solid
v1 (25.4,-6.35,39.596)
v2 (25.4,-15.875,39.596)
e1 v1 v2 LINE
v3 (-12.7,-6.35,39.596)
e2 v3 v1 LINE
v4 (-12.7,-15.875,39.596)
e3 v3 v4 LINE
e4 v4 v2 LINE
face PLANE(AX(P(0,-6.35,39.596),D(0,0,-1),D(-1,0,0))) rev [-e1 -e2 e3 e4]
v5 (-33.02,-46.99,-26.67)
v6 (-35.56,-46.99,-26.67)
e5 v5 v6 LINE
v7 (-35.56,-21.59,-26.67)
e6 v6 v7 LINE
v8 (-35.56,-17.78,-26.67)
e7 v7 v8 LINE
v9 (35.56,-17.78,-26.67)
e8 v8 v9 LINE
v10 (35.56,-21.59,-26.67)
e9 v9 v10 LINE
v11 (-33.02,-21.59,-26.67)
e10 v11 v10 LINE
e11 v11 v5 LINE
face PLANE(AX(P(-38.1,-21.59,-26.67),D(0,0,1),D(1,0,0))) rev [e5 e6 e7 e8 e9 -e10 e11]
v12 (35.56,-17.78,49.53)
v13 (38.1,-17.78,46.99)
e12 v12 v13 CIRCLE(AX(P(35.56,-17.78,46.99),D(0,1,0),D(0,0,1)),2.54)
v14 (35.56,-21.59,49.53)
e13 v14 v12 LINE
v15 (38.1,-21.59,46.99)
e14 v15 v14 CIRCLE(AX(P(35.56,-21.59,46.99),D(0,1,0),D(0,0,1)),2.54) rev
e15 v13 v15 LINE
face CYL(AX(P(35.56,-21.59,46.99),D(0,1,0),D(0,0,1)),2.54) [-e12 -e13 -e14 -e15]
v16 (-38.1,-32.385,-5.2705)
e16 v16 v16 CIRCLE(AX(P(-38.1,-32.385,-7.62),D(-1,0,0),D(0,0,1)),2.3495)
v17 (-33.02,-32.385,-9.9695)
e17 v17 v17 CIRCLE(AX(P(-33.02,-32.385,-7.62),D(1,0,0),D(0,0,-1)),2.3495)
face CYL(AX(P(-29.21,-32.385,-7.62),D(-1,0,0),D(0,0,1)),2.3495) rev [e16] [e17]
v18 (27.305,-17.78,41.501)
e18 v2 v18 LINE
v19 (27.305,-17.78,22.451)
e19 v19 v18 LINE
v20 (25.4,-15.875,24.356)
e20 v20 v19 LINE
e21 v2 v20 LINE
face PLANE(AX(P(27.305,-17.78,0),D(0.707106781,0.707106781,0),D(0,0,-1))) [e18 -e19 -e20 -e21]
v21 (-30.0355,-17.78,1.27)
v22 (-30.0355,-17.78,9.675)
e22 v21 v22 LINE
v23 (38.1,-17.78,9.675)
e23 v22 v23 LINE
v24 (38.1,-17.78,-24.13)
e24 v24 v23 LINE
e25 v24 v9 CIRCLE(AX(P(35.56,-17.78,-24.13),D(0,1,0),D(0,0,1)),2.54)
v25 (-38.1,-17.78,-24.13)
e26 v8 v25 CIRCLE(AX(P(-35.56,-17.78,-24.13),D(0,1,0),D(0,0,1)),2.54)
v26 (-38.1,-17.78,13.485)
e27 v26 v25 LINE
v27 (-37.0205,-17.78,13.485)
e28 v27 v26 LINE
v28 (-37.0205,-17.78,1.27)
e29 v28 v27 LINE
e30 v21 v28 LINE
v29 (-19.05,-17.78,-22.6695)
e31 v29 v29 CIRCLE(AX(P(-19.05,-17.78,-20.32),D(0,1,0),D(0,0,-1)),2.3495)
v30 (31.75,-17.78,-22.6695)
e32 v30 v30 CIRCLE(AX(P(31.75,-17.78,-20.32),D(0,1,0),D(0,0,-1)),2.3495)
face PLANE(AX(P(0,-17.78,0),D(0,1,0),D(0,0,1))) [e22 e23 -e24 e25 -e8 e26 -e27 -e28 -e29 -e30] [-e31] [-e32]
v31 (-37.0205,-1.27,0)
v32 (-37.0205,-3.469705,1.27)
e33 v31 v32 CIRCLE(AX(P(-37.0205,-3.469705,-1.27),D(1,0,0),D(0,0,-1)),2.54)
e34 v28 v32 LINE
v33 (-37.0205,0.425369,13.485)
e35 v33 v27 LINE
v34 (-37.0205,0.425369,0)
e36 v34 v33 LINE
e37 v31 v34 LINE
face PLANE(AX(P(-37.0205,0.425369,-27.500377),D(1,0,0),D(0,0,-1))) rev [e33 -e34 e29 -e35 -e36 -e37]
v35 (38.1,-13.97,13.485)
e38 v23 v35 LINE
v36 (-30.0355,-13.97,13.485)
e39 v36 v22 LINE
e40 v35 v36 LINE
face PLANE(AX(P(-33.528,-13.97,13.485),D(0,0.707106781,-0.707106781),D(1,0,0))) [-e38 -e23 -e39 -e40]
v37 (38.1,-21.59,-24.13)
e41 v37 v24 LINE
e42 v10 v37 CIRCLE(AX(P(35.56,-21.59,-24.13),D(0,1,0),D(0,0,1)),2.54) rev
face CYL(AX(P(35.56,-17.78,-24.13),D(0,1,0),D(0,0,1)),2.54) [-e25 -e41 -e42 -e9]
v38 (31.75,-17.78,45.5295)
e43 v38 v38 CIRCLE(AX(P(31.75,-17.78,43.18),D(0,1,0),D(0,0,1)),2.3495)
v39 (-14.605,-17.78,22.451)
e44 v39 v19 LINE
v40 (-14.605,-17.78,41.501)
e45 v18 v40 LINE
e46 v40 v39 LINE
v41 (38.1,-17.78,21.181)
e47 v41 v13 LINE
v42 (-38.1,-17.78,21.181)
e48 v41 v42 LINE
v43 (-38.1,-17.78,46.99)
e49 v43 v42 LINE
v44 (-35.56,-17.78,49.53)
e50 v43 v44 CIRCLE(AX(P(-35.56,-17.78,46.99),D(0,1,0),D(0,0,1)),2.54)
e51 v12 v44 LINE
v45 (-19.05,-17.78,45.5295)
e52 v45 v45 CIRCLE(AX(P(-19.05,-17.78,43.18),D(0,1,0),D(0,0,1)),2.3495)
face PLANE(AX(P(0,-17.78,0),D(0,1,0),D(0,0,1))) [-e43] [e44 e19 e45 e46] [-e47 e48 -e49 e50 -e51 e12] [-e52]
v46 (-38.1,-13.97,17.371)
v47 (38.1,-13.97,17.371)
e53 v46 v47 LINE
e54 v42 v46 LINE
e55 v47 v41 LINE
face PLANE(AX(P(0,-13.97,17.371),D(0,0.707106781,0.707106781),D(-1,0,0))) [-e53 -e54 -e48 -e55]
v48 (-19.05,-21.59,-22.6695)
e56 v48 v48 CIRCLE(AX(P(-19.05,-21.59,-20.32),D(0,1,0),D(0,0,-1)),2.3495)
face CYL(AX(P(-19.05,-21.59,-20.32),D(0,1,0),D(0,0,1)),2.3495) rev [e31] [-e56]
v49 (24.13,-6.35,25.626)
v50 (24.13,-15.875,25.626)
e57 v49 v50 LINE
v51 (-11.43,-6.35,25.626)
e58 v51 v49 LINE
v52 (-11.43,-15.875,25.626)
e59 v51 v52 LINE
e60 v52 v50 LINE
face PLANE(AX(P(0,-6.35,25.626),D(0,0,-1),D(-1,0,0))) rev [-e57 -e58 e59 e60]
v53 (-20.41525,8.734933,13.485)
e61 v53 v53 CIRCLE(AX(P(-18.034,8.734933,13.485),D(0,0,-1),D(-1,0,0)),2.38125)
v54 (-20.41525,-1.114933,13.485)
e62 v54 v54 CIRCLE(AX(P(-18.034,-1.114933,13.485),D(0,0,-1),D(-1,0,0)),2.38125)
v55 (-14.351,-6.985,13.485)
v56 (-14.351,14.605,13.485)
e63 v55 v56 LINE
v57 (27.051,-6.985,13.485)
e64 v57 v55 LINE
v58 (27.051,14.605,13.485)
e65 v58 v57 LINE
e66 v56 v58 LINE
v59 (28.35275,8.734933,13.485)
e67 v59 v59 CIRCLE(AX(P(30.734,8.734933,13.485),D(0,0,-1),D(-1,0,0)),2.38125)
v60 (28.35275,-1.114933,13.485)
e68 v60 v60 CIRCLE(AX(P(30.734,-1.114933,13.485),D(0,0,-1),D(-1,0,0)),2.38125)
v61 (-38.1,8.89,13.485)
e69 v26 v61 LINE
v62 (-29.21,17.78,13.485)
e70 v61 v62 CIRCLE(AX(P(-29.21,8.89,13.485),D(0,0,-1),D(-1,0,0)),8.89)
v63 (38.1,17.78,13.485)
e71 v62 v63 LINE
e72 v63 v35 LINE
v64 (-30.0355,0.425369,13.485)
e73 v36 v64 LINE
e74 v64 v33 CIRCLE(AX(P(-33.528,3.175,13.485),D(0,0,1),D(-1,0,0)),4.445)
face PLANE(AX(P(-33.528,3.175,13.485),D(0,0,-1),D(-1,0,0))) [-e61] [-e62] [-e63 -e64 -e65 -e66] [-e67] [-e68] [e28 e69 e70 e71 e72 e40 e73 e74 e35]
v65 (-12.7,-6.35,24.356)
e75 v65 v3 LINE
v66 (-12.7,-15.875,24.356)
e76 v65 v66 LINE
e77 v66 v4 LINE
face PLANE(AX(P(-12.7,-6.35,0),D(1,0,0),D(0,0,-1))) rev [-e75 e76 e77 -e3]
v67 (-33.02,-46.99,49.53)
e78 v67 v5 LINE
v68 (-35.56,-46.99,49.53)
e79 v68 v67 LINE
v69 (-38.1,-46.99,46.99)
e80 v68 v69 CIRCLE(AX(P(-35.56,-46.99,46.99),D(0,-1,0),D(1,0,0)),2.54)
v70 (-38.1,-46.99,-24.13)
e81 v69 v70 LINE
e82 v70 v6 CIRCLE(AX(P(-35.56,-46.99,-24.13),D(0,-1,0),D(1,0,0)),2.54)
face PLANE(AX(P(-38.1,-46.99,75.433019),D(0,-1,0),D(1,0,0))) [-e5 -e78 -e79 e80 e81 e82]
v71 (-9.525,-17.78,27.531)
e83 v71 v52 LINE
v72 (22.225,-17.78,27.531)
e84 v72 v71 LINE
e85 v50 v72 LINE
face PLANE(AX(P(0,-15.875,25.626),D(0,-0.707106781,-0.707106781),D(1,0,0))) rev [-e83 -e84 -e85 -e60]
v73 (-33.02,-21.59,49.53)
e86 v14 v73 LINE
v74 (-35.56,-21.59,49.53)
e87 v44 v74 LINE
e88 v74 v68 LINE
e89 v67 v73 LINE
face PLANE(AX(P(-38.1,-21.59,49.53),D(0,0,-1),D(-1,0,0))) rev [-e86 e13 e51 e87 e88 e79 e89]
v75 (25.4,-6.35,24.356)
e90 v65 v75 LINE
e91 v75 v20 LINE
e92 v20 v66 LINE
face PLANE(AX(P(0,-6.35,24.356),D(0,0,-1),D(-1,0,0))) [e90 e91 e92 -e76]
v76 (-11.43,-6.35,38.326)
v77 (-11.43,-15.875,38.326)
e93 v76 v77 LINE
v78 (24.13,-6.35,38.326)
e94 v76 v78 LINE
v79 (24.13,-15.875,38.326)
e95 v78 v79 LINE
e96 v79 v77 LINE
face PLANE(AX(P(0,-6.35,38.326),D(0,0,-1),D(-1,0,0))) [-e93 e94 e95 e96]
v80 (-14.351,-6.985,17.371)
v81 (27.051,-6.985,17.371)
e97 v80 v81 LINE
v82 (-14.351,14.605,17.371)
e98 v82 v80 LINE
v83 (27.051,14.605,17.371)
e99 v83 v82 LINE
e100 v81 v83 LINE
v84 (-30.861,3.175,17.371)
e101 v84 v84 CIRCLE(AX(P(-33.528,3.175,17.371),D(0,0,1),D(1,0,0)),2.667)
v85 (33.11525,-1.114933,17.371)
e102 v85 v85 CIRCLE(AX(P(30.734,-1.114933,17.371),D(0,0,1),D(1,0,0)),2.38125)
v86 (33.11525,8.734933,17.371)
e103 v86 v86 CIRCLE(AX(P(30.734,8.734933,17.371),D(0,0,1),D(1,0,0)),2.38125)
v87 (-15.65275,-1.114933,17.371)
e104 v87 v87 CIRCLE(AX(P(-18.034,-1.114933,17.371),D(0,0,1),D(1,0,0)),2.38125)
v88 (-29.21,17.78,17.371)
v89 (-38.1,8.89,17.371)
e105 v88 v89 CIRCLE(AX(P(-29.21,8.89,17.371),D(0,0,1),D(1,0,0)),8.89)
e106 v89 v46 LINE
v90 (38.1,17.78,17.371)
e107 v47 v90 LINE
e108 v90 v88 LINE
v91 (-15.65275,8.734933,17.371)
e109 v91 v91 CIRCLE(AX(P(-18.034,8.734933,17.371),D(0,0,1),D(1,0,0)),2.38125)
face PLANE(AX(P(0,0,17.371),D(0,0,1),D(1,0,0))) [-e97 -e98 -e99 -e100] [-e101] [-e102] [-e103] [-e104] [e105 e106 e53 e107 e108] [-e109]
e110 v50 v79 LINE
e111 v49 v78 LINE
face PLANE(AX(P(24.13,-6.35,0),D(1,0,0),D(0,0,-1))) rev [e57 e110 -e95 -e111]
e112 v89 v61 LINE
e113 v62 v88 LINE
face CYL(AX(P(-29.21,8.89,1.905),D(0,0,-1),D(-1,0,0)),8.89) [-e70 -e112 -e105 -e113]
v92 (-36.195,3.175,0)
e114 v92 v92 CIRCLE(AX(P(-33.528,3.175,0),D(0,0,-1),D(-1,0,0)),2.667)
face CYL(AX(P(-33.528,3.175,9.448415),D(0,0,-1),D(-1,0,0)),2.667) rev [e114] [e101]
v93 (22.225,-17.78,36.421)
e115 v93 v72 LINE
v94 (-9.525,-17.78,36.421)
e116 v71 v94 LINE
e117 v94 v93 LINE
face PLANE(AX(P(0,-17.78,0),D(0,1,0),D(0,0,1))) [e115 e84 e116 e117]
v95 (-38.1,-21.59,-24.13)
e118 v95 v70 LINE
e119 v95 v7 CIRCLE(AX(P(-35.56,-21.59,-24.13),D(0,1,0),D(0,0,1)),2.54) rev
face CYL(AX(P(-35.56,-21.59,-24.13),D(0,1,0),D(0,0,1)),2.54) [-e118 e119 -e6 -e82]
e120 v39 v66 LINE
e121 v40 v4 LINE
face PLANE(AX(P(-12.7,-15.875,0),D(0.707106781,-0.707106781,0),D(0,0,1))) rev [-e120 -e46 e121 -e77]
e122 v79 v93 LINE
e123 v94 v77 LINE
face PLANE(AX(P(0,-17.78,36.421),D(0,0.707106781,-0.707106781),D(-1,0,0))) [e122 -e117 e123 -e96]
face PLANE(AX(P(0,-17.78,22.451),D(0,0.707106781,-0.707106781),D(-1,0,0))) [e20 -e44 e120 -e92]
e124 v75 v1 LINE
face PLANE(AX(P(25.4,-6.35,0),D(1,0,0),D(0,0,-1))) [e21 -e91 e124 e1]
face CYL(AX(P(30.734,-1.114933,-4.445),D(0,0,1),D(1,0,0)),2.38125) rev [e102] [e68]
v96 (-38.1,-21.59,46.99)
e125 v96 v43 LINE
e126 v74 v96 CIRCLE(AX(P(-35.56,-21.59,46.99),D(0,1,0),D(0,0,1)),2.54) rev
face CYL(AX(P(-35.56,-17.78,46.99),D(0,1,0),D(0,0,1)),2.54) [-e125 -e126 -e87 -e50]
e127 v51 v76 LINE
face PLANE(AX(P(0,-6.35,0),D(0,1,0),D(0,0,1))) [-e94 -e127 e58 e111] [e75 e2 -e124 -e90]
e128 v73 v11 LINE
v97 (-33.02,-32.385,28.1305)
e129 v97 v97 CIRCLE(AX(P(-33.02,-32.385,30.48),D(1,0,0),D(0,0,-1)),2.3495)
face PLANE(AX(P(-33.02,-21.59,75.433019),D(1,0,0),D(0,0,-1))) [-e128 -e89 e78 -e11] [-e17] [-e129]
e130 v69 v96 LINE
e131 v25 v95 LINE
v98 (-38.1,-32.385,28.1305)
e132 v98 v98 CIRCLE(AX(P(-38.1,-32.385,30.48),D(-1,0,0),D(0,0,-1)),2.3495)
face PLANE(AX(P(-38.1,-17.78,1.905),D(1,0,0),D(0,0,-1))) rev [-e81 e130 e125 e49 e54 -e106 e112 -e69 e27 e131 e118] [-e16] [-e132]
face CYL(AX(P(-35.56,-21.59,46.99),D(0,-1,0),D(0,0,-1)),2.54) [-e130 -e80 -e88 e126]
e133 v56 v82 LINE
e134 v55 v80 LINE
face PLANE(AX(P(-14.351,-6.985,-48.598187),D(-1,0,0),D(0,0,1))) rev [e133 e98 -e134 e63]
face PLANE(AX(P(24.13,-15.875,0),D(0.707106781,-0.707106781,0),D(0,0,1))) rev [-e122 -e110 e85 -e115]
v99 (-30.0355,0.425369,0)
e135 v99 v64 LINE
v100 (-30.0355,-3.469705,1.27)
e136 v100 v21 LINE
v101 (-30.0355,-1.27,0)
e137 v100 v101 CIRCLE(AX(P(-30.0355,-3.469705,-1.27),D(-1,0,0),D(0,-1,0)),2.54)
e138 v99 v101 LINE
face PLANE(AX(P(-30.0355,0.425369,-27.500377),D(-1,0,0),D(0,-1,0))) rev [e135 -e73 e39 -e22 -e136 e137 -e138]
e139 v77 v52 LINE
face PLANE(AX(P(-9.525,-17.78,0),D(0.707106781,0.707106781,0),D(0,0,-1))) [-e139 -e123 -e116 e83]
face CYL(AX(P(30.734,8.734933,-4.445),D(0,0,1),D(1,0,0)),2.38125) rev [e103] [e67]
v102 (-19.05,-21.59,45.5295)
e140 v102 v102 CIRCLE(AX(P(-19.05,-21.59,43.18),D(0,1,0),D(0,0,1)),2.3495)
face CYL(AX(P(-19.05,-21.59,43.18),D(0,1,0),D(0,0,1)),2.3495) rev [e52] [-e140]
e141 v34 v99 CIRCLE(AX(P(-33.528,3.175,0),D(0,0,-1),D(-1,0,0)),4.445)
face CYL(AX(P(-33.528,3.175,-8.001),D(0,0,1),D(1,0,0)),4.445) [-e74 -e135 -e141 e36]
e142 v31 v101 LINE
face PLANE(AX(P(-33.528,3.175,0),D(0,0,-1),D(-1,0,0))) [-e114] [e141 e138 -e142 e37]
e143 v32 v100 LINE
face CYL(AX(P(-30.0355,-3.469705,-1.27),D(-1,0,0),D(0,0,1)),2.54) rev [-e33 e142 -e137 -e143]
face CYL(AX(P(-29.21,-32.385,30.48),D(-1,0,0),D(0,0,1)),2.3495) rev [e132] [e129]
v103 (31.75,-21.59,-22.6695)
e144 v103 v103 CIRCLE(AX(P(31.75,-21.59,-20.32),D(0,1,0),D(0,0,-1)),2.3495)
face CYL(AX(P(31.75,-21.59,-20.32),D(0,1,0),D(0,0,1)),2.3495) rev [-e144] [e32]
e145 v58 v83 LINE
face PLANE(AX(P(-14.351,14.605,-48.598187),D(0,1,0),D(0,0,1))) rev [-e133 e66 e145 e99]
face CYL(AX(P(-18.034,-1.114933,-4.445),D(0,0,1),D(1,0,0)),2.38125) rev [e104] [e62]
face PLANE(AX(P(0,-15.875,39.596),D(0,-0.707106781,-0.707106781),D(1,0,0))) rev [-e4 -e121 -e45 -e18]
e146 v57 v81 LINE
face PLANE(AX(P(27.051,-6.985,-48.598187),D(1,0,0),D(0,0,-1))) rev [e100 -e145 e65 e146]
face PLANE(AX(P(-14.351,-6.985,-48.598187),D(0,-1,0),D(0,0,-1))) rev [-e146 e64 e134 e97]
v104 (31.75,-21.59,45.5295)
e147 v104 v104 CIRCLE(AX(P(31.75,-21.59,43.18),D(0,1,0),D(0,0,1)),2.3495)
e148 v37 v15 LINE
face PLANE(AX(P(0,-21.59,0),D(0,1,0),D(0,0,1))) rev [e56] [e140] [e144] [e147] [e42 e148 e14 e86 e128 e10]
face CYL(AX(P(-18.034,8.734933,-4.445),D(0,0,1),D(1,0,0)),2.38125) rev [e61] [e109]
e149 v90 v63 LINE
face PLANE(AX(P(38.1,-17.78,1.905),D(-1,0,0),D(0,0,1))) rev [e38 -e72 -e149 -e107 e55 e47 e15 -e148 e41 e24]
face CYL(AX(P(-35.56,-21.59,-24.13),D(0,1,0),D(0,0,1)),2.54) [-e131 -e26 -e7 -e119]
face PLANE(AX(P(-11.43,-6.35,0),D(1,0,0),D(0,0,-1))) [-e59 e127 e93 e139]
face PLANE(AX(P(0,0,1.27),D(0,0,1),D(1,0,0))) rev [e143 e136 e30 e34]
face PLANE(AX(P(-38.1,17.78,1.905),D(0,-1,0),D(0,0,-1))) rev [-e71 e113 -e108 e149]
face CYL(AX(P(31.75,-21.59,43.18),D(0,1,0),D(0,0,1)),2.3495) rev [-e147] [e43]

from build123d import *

# Parameters (mm, degrees)
SKETCH1_W            = 76.2
SKETCH1_H            = 35.56
BOSS_EXTRUDE1_DEPTH  = 1.905
SKETCH2_R            = 2.38125
CUT_EXTRUDE1_DEPTH   = 6.35
SKETCH3_W            = 41.402
SKETCH3_H            = 21.59
CUT_EXTRUDE2_DEPTH   = 3.81
SKETCH5_W            = 76.2
SKETCH5_H            = 76.2
BOSS_EXTRUDE2_DEPTH  = 3.81
SKETCH8_R            = 2.667
CUT_EXTRUDE5_DEPTH   = 3.81
BOSS_EXTRUDE4_START  = 6.096
SKETCH9_R            = 4.445
SKETCH9_R_2          = 2.667
BOSS_EXTRUDE4_DEPTH  = 6.096
SKETCH10_W           = 6.985
SKETCH10_H           = 18.205369343
BOSS_EXTRUDE5_DEPTH  = 6.096
SKETCH11_R           = 4.445
SKETCH11_R_2         = 2.667
BOSS_EXTRUDE6_DEPTH  = 5.08
SKETCH12_W           = 6.985
SKETCH12_H           = 18.205369343
BOSS_EXTRUDE7_DEPTH  = 5.08
SKETCH13_R           = 2.3495
CUT_EXTRUDE6_DEPTH   = 72.898153662
BOSS_EXTRUDE8_START  = 15.466000132
SKETCH14_R           = 2.38125
SKETCH14_R_2         = 2.667
SKETCH14_W           = 41.402
SKETCH14_H           = 21.59
BOSS_EXTRUDE8_DEPTH  = 15.466000132
CUT_EXTRUDE7_START   = -15.39000003
SKETCH15_R           = 2.38125
SKETCH15_W           = 41.402
SKETCH15_H           = 21.59
CUT_EXTRUDE7_DEPTH   = 15.39000003
CUT_EXTRUDE8_START   = -8.001
SKETCH16_R           = 2.667
CUT_EXTRUDE8_DEPTH   = 8.001
FILLET1_R            = 2.54
CHAMFER1_SIZE        = 3.81
FILLET2_R            = 8.89
SKETCH17_W           = 5.08
SKETCH17_H           = 25.4
BOSS_EXTRUDE9_DEPTH  = 76.2
SKETCH18_W           = 38.1
SKETCH18_H           = 15.24
SKETCH18_W_2         = 35.56
SKETCH18_H_2         = 12.7
BOSS_EXTRUDE10_DEPTH = 11.43
CHAMFER2_SIZE        = 1.905
FILLET3_R            = 2.54
SKETCH19_R           = 2.3495
CUT_EXTRUDE9_DEPTH   = 8.89
SKETCH20_W           = 6.985
SKETCH20_H           = 16.51
CUT_EXTRUDE10_DEPTH  = 1.27
FILLET4_R            = 2.54


with BuildPart() as part:
    # Sketch1 → Boss-Extrude1 (new, symmetric)
    with BuildSketch(Plane.XY):
        Rectangle(SKETCH1_W, SKETCH1_H)
    extrude(amount=BOSS_EXTRUDE1_DEPTH, both=True)

    # Sketch2 → Cut-Extrude1 (cut)
    with BuildSketch(Plane.XY.offset(1.905)):
        with Locations((-18.034, 8.734933)):
            Circle(SKETCH2_R)
        with Locations((30.734, 8.734933)):
            Circle(SKETCH2_R)
        with Locations((30.734, -1.114933)):
            Circle(SKETCH2_R)
        with Locations((-18.034, -1.114933)):
            Circle(SKETCH2_R)
    extrude(amount=-CUT_EXTRUDE1_DEPTH, mode=Mode.SUBTRACT)

    # Sketch3 → Cut-Extrude2 (cut)
    with BuildSketch(Plane.XY.offset(1.905)):
        with Locations((6.35, 3.81)):
            Rectangle(SKETCH3_W, SKETCH3_H)
    extrude(amount=-CUT_EXTRUDE2_DEPTH, mode=Mode.SUBTRACT)

    # Sketch5 → Boss-Extrude2 (add)
    with BuildSketch(Plane.XZ.offset(17.78)):
        with Locations((0, 11.43)):
            Rectangle(SKETCH5_W, SKETCH5_H)
    extrude(amount=BOSS_EXTRUDE2_DEPTH)

    # Sketch8 → Cut-Extrude5 (cut)
    with BuildSketch(Plane(origin=(0, 0, -1.905), x_dir=(-1, 0, 0), z_dir=(0, 0, -1))):
        with Locations((33.528, 3.175)):
            Circle(SKETCH8_R)
    extrude(amount=-CUT_EXTRUDE5_DEPTH, mode=Mode.SUBTRACT)

    # Sketch9 → Boss-Extrude4 (add)
    with BuildSketch(Plane(origin=(0, 0, -1.905), x_dir=(-1, 0, 0), z_dir=(0, 0, -1)).offset(BOSS_EXTRUDE4_START)):
        with Locations(Location((33.528, 3.175, 0), (0, 0, 180))):
            Circle(SKETCH9_R)
        with Locations((33.528, 3.175)):
            Circle(SKETCH9_R_2, mode=Mode.SUBTRACT)
    extrude(amount=-BOSS_EXTRUDE4_DEPTH)

    # Sketch10 → Boss-Extrude5 (add)
    with BuildSketch(Plane(origin=(0, 0, -1.905), x_dir=(-1, 0, 0), z_dir=(0, 0, -1))):
        with Locations((33.528, -8.677315329)):
            Rectangle(SKETCH10_W, SKETCH10_H)
    extrude(amount=BOSS_EXTRUDE5_DEPTH)

    # Sketch11 → Boss-Extrude6 (add)
    with BuildSketch(Plane.XY.offset(1.905)):
        with Locations(Location((-33.528, 3.175, 0), (0, 0, 180))):
            Circle(SKETCH11_R)
        with Locations(Location((-33.528, 3.175, 0), (0, 0, 180))):
            Circle(SKETCH11_R_2, mode=Mode.SUBTRACT)
    extrude(amount=BOSS_EXTRUDE6_DEPTH)

    # Sketch12 → Boss-Extrude7 (add)
    with BuildSketch(Plane.XY.offset(1.905)):
        with Locations((-33.528, -8.677315329)):
            Rectangle(SKETCH12_W, SKETCH12_H)
    extrude(amount=BOSS_EXTRUDE7_DEPTH)

    # Sketch13 → Cut-Extrude6 (cut, through all)
    with BuildSketch(Plane(origin=(0, -17.78, 0), x_dir=(1, 0, 0), z_dir=(0, 1, 0))):
        with Locations(Location((-19.05, 20.32, 0), (0, 0, 90))):
            Circle(SKETCH13_R)
        with Locations(Location((31.75, 20.32, 0), (0, 0, 90))):
            Circle(SKETCH13_R)
        with Locations(Location((31.75, -43.18, 0), (0, 0, 270))):
            Circle(SKETCH13_R)
        with Locations(Location((-19.05, -43.18, 0), (0, 0, 270))):
            Circle(SKETCH13_R)
    extrude(amount=-CUT_EXTRUDE6_DEPTH, mode=Mode.SUBTRACT)

    # Sketch14 → Boss-Extrude8 (add)
    with BuildSketch(Plane.XY.offset(1.905).offset(BOSS_EXTRUDE8_START)):
        Polygon((-30.0355, -17.78), (38.1, -17.78), (38.1, 17.78), (-38.1, 17.78), (-38.1, -17.78), (-37.0205, -17.78), align=None)
        with Locations((30.734, -1.114933)):
            Circle(SKETCH14_R, mode=Mode.SUBTRACT)
        with Locations((30.734, 8.734933)):
            Circle(SKETCH14_R, mode=Mode.SUBTRACT)
        with Locations((-18.034, -1.114933)):
            Circle(SKETCH14_R, mode=Mode.SUBTRACT)
        with Locations((-18.034, 8.734933)):
            Circle(SKETCH14_R, mode=Mode.SUBTRACT)
        with Locations(Location((-33.528, 3.175, 0), (0, 0, 180))):
            Circle(SKETCH14_R_2, mode=Mode.SUBTRACT)
        with Locations((6.35, 3.81)):
            Rectangle(SKETCH14_W, SKETCH14_H, mode=Mode.SUBTRACT)
    extrude(amount=-BOSS_EXTRUDE8_DEPTH)

    # Sketch15 → Cut-Extrude7 (cut)
    with BuildSketch(Plane(origin=(0, 0, -1.905), x_dir=(-1, 0, 0), z_dir=(0, 0, -1)).offset(CUT_EXTRUDE7_START)):
        with BuildLine():
            Line((-38.1, -17.78), (30.0355, -17.78))
            Line((30.0355, -17.78), (30.0355, 0.425369343))
            ThreePointArc((30.0355, 0.425369343), (33.528, 7.62), (37.0205, 0.425369343))
            Line((37.0205, 0.425369343), (37.0205, -17.78))
            Line((37.0205, -17.78), (38.1, -17.78))
            Line((38.1, -17.78), (38.1, 17.78))
            Line((38.1, 17.78), (-38.1, 17.78))
            Line((-38.1, 17.78), (-38.1, -17.78))
        make_face()
        with Locations(Location((18.034, -1.114933, 0), (0, 0, 180))):
            Circle(SKETCH15_R, mode=Mode.SUBTRACT)
        with Locations(Location((18.034, 8.734933, 0), (0, 0, 180))):
            Circle(SKETCH15_R, mode=Mode.SUBTRACT)
        with Locations(Location((-30.734, -1.114933, 0), (0, 0, 180))):
            Circle(SKETCH15_R, mode=Mode.SUBTRACT)
        with Locations(Location((-30.734, 8.734933, 0), (0, 0, 180))):
            Circle(SKETCH15_R, mode=Mode.SUBTRACT)
        with Locations((-6.35, 3.81)):
            Rectangle(SKETCH15_W, SKETCH15_H, mode=Mode.SUBTRACT)
    extrude(amount=CUT_EXTRUDE7_DEPTH, mode=Mode.SUBTRACT)

    # Sketch16 → Cut-Extrude8 (cut)
    with BuildSketch(Plane(origin=(0, 0, -8.001), x_dir=(-1, 0, 0), z_dir=(0, 0, -1)).offset(CUT_EXTRUDE8_START)):
        with BuildLine():
            Line((30.0355, 0.425369343), (30.0355, -17.78))
            Line((30.0355, -17.78), (37.0205, -17.78))
            Line((37.0205, -17.78), (37.0205, 0.425369343))
            ThreePointArc((37.0205, 0.425369343), (33.528, 7.62), (30.0355, 0.425369343))
        make_face()
        with Locations((33.528, 3.175)):
            Circle(SKETCH16_R, mode=Mode.SUBTRACT)
    extrude(amount=CUT_EXTRUDE8_DEPTH, mode=Mode.SUBTRACT)

    # Fillet1
    fillet1_edges = [part.edges().sort_by_distance(p)[0] for p in [
        (38.1, -19.685, -26.67),
        (38.1, -19.685, 49.53),
        (-38.1, -19.685, 49.53),
        (-38.1, -19.685, -26.67),
    ]]
    fillet(fillet1_edges, radius=FILLET1_R)

    # Chamfer1
    chamfer1_edges = [part.edges().sort_by_distance(p)[0] for p in [
        (0, -17.78, 17.371000132),
        (4.03225, -17.78, 13.48500003),
    ]]
    chamfer(chamfer1_edges, length=CHAMFER1_SIZE)

    # Fillet2
    fillet2_edges = [part.edges().sort_by_distance(p)[0] for p in [
        (-38.1, 17.78, 15.428000081),
    ]]
    fillet(fillet2_edges, radius=FILLET2_R)

    # Sketch17 → Boss-Extrude9 (add)
    with BuildSketch(Plane(origin=(0, 0, -26.67), x_dir=(-1, 0, 0), z_dir=(0, 0, -1))):
        with Locations((35.56, -34.29)):
            Rectangle(SKETCH17_W, SKETCH17_H)
    extrude(amount=-BOSS_EXTRUDE9_DEPTH)

    # Sketch18 → Boss-Extrude10 (add)
    with BuildSketch(Plane(origin=(0, -17.78, 0), x_dir=(1, 0, 0), z_dir=(0, 1, 0))):
        with Locations((6.35, -31.976000132)):
            Rectangle(SKETCH18_W, SKETCH18_H)
        with Locations((6.35, -31.976000132)):
            Rectangle(SKETCH18_W_2, SKETCH18_H_2, mode=Mode.SUBTRACT)
    extrude(amount=BOSS_EXTRUDE10_DEPTH)

    # Chamfer2
    chamfer2_edges = [part.edges().sort_by_distance(p)[0] for p in [
        (6.35, -17.78, 25.626000132),
        (24.13, -17.78, 31.976000132),
        (-12.7, -17.78, 31.976000132),
        (6.35, -17.78, 39.596000132),
        (25.4, -17.78, 31.976000132),
        (6.35, -17.78, 24.356000132),
        (-11.43, -17.78, 31.976000132),
        (6.35, -17.78, 38.326000132),
    ]]
    chamfer(chamfer2_edges, length=CHAMFER2_SIZE)

    # Fillet3
    fillet3_edges = [part.edges().sort_by_distance(p)[0] for p in [
        (-38.1, -34.29, 49.53),
        (-38.1, -34.29, -26.67),
    ]]
    fillet(fillet3_edges, radius=FILLET3_R)

    # Sketch19 → Cut-Extrude9 (cut)
    with BuildSketch(Plane.ZY.offset(38.1)):
        with Locations((-7.62, -32.385)):
            Circle(SKETCH19_R)
        with Locations(Location((30.48, -32.385, 0), (0, 0, 180))):
            Circle(SKETCH19_R)
    extrude(amount=-CUT_EXTRUDE9_DEPTH, mode=Mode.SUBTRACT)

    # Sketch20 → Cut-Extrude10 (cut)
    with BuildSketch(Plane(origin=(0, 0, 0), x_dir=(-1, 0, 0), z_dir=(0, 0, -1))):
        with Locations((33.528, -9.525)):
            Rectangle(SKETCH20_W, SKETCH20_H)
    extrude(amount=-CUT_EXTRUDE10_DEPTH, mode=Mode.SUBTRACT)

    # Fillet4
    # the kernel refuses this fillet: 2.54 mm, written as the material it adds along each edge
    with BuildSketch(Plane(origin=(-37.0205, -1.27, 1.27), x_dir=(0, -1, 0), z_dir=(1, 0, 0))) as fillet4_piece_1:
        with BuildLine():
            CenterArc((2.199704526, 2.54), FILLET4_R, 210, 60)
            Line((0, 1.27), (-0.043994091, 1.2446))
            ThreePointArc((-0.043994091, 1.2446), (-0.0508, 0.635), (-0.0508, 0))
            Line((-0.0508, 0), (0, -0.0508))
            Line((0, -0.0508), (2.199704526, -0.0508))
            Line((2.199704526, -0.0508), (2.199704526, 0))
        make_face()
    extrude(amount=6.985)


solid = part.part
